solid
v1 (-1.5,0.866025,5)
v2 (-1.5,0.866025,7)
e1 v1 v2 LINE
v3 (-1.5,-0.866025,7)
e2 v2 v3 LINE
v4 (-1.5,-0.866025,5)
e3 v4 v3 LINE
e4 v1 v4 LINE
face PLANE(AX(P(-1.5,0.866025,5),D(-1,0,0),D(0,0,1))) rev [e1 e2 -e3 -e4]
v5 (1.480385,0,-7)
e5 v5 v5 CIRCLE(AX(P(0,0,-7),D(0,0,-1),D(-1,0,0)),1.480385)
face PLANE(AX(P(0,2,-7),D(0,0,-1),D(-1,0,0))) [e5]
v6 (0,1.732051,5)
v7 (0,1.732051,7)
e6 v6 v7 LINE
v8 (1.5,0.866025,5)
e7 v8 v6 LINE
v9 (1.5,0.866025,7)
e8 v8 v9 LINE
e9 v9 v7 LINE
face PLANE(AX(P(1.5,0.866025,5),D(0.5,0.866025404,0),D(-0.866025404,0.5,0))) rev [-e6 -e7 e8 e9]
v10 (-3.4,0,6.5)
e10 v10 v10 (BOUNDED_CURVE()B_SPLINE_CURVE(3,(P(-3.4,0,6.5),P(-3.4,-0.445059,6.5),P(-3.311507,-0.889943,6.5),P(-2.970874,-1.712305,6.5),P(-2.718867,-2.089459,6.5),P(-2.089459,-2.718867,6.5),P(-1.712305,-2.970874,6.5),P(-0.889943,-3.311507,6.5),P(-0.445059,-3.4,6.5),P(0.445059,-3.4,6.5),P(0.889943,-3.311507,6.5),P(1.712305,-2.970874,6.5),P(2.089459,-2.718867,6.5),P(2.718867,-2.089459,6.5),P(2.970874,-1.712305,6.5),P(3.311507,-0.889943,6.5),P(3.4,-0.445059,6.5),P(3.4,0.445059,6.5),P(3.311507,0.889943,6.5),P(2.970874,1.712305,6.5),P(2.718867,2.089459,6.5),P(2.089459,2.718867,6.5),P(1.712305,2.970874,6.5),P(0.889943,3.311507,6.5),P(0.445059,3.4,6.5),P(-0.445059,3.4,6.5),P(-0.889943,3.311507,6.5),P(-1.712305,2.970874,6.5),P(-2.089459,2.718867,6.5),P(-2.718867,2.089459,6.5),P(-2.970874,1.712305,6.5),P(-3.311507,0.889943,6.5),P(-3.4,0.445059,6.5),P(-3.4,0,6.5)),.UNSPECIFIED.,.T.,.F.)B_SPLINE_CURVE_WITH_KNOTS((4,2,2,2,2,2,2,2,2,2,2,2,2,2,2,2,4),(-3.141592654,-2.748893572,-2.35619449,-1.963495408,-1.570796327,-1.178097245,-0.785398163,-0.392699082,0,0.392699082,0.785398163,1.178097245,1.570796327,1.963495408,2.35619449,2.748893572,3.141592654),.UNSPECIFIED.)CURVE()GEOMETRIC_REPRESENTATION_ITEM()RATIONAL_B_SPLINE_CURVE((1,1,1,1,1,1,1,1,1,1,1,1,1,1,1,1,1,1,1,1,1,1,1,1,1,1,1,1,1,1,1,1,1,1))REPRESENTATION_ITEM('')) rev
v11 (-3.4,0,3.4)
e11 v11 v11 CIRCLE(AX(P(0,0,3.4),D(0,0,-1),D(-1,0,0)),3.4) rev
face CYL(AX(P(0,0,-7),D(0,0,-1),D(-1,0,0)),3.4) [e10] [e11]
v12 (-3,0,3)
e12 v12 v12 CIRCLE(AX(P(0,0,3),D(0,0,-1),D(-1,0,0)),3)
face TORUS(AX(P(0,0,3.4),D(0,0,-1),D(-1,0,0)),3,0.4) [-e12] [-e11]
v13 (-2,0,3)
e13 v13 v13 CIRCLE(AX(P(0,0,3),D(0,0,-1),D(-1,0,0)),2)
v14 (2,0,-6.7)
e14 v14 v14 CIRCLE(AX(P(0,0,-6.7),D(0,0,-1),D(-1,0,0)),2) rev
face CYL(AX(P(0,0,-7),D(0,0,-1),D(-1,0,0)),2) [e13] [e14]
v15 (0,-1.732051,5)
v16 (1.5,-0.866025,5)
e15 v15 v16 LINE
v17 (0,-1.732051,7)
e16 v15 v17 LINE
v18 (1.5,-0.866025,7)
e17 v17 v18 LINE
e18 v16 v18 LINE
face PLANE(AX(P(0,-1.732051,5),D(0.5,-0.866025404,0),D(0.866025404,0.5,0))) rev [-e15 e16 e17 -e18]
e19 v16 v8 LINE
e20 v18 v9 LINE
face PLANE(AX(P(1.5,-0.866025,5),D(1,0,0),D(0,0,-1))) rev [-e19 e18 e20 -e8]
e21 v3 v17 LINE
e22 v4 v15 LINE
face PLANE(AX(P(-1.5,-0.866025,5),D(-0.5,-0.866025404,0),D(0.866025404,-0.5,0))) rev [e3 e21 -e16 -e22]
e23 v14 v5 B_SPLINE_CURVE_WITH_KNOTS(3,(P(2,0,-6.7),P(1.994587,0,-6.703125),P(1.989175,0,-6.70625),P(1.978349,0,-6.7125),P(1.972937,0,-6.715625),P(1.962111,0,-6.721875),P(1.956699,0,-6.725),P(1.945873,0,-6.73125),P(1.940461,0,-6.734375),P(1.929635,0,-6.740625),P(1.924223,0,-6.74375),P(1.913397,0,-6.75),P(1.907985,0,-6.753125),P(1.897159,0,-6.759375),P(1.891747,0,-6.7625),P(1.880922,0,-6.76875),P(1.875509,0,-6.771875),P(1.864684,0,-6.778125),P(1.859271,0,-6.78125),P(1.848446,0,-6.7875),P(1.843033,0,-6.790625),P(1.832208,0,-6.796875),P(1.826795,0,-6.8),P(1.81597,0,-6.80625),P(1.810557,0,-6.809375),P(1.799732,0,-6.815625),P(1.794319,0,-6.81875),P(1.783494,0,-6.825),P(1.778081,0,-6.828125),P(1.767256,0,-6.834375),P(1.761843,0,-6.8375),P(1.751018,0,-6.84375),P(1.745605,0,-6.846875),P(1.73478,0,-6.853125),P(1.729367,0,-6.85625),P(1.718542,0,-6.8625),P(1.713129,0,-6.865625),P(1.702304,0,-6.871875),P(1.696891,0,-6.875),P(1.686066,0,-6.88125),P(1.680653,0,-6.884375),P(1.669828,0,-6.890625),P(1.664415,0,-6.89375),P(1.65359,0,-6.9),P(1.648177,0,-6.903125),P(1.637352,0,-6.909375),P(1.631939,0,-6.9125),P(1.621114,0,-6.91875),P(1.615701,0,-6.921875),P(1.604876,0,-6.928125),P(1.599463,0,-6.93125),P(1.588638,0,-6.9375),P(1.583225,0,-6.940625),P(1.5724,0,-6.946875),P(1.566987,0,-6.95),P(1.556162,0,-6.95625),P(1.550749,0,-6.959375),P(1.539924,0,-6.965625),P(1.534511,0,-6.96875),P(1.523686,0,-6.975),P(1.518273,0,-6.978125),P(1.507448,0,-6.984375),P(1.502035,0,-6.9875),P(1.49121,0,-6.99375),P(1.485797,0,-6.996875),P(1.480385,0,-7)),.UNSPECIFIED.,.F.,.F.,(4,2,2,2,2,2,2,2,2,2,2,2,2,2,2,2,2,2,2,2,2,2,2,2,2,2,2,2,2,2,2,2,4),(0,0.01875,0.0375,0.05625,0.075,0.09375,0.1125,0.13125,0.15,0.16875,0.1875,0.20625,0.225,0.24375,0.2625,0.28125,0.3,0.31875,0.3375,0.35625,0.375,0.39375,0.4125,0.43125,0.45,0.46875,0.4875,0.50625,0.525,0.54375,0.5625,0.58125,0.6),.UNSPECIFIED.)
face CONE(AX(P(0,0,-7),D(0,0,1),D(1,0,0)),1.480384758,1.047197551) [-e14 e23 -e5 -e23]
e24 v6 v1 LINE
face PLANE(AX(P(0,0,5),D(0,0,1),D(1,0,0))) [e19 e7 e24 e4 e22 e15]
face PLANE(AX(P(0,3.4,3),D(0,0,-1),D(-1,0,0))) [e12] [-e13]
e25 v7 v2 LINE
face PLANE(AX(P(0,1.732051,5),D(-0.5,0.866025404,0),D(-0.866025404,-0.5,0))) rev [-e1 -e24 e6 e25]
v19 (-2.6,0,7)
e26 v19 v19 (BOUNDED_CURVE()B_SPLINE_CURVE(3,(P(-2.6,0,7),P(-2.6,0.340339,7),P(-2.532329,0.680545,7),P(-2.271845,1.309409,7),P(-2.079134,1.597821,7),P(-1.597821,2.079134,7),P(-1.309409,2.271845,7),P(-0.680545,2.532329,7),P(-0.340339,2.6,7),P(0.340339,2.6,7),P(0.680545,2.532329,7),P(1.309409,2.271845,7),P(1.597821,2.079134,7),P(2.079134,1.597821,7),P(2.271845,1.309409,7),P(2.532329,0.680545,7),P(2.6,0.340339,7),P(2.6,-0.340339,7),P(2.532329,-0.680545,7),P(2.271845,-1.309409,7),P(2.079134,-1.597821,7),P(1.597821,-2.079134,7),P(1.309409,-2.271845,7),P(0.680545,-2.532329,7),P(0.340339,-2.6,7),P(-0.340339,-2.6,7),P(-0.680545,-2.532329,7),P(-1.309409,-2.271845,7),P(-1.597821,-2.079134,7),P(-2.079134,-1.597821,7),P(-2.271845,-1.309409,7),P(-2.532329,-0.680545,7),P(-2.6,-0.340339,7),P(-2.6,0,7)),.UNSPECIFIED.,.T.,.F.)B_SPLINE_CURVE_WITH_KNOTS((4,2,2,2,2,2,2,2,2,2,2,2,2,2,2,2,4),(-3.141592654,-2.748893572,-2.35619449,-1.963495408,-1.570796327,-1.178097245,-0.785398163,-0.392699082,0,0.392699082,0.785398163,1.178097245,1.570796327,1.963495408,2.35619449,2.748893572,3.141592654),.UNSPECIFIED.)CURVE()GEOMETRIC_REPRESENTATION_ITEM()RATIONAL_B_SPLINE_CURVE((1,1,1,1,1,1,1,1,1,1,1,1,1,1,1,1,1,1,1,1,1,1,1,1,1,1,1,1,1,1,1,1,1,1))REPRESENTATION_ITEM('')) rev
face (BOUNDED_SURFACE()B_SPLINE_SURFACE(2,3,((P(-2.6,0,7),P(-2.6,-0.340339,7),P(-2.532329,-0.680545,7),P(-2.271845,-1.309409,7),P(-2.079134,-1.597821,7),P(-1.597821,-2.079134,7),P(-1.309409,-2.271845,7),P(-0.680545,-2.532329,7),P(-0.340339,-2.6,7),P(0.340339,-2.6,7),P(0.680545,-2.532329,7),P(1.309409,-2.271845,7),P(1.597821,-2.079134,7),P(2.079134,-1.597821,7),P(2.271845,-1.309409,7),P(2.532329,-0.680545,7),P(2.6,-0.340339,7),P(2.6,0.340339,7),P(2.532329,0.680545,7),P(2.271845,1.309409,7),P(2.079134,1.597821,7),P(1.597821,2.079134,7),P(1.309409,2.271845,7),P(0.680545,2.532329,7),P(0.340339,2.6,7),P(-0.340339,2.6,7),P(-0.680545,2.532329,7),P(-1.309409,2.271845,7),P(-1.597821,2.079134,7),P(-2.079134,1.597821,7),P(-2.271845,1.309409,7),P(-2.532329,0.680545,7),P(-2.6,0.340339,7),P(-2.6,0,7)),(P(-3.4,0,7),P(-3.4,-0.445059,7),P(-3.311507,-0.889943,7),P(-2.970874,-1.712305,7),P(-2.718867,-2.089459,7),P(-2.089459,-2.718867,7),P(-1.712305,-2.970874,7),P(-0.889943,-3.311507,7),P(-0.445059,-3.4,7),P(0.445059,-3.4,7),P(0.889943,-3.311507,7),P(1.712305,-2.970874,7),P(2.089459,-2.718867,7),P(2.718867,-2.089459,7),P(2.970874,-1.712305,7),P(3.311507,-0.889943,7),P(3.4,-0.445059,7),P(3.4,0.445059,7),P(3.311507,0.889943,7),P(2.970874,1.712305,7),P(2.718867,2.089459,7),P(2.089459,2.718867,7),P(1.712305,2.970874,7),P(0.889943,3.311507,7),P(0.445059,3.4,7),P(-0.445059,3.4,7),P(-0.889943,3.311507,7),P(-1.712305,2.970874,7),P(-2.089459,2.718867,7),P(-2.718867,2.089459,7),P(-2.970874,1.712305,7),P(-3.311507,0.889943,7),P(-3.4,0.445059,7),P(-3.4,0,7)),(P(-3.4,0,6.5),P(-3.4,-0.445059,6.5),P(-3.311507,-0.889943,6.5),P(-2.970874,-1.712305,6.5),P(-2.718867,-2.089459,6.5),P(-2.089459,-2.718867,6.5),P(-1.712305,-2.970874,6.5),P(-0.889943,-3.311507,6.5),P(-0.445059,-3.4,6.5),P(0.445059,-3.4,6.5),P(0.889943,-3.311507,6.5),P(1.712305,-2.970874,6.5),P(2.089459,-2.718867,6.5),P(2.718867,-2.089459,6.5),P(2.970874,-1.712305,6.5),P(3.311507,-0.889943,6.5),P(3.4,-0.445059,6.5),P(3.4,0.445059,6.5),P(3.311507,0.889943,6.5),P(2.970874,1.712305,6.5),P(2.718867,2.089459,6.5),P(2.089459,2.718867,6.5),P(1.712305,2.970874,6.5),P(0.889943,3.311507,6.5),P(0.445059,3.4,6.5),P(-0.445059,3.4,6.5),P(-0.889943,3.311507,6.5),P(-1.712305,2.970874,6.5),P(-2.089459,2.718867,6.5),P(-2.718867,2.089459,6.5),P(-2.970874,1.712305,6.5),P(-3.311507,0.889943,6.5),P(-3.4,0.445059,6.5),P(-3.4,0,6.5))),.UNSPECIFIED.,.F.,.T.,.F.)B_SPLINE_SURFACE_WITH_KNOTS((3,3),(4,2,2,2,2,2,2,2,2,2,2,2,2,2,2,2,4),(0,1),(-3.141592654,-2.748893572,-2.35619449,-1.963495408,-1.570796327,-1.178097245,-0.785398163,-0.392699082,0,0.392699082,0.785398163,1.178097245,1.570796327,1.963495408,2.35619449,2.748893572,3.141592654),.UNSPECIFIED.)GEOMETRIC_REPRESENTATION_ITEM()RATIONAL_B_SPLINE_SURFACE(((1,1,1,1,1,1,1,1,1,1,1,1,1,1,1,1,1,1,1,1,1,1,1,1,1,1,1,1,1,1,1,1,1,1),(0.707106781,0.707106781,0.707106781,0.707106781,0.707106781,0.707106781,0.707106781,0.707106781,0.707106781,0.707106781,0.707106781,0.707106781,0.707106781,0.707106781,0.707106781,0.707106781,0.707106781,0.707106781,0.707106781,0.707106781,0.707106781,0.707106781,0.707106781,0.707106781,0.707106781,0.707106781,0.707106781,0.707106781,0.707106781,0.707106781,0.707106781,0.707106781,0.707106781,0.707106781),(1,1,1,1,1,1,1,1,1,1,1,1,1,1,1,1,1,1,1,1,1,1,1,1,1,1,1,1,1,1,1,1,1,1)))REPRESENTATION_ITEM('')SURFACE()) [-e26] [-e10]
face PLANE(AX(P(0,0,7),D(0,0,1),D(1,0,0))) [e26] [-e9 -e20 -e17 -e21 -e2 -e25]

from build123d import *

# Parameters (mm, degrees)
CHAMFER_1_SIZE      = 0.3
CHAMFER_1_SIZE2     = 0.519615242
FILLET_1_R          = 0.4
FILLET_2_SIZE       = 0.5
FILLET_2_SIZE_2     = 0.8
CUT_EXTRUDE_1_DEPTH = 2


with BuildPart() as part:
    # 草图2 → 旋转1 (revolve)
    with BuildSketch(Plane(origin=(0, 0, 0), x_dir=(0, 0, -1), z_dir=(1, 0, 0)), mode=Mode.PRIVATE) as revolve_1_sk:
        Polygon((-7, 0), (-7, 3.4), (-3, 3.4), (-3, 2), (7, 2), (7, 0), align=None)
    revolve(revolve_1_sk.sketch.rotate(Axis((0, 0, -7), (0, 0, 1)), 90), axis=Axis((0, 0, -7), (0, 0, 1)))

    # 倒角1
    chamfer_1_edges = [part.edges().sort_by_distance(p)[0] for p in [
        (2, 0, -7),
    ]]
    chamfer_1_side = [part.faces().sort_by_distance(p)[0] for p in [
        (2, 0, -2),
    ]]
    chamfer(chamfer_1_edges, length=CHAMFER_1_SIZE, length2=CHAMFER_1_SIZE2, reference=chamfer_1_side[0])

    # 圆角1
    fillet_1_edges = [part.edges().sort_by_distance(p)[0] for p in [
        (3.4, 0, 3),
    ]]
    fillet(fillet_1_edges, radius=FILLET_1_R)

    # 圆角2
    # an asymmetric fillet: 0.8, 0.5 mm, written as the material it takes off along each edge
    with BuildSketch(Plane(origin=(0, 0, 7), x_dir=(-1, 0, 0), z_dir=(0, 1, 0))) as fillet_2_piece_1:
        with BuildLine():
            Bezier((3.4, -FILLET_2_SIZE), (3.4, 0), (3.4 - FILLET_2_SIZE_2, 0), weights=[1, 0.707106781, 1])
            Line((3.4 - FILLET_2_SIZE_2, 0), (3.4, 0))
            Line((3.4, 0), (3.4, -FILLET_2_SIZE))
        make_face()
    revolve(axis=Axis((0, 0, 7), (0, 0, 1)), mode=Mode.SUBTRACT)

    # 草图3 → 切除-拉伸1 (cut)
    with BuildSketch(Plane.XY.offset(7)):
        Polygon((0, 1.732050808), (-1.5, 0.866025404), (-1.5, -0.866025404), (0, -1.732050808), (1.5, -0.866025404), (1.5, 0.866025404), align=None)
    extrude(amount=-CUT_EXTRUDE_1_DEPTH, mode=Mode.SUBTRACT)


solid = part.part
